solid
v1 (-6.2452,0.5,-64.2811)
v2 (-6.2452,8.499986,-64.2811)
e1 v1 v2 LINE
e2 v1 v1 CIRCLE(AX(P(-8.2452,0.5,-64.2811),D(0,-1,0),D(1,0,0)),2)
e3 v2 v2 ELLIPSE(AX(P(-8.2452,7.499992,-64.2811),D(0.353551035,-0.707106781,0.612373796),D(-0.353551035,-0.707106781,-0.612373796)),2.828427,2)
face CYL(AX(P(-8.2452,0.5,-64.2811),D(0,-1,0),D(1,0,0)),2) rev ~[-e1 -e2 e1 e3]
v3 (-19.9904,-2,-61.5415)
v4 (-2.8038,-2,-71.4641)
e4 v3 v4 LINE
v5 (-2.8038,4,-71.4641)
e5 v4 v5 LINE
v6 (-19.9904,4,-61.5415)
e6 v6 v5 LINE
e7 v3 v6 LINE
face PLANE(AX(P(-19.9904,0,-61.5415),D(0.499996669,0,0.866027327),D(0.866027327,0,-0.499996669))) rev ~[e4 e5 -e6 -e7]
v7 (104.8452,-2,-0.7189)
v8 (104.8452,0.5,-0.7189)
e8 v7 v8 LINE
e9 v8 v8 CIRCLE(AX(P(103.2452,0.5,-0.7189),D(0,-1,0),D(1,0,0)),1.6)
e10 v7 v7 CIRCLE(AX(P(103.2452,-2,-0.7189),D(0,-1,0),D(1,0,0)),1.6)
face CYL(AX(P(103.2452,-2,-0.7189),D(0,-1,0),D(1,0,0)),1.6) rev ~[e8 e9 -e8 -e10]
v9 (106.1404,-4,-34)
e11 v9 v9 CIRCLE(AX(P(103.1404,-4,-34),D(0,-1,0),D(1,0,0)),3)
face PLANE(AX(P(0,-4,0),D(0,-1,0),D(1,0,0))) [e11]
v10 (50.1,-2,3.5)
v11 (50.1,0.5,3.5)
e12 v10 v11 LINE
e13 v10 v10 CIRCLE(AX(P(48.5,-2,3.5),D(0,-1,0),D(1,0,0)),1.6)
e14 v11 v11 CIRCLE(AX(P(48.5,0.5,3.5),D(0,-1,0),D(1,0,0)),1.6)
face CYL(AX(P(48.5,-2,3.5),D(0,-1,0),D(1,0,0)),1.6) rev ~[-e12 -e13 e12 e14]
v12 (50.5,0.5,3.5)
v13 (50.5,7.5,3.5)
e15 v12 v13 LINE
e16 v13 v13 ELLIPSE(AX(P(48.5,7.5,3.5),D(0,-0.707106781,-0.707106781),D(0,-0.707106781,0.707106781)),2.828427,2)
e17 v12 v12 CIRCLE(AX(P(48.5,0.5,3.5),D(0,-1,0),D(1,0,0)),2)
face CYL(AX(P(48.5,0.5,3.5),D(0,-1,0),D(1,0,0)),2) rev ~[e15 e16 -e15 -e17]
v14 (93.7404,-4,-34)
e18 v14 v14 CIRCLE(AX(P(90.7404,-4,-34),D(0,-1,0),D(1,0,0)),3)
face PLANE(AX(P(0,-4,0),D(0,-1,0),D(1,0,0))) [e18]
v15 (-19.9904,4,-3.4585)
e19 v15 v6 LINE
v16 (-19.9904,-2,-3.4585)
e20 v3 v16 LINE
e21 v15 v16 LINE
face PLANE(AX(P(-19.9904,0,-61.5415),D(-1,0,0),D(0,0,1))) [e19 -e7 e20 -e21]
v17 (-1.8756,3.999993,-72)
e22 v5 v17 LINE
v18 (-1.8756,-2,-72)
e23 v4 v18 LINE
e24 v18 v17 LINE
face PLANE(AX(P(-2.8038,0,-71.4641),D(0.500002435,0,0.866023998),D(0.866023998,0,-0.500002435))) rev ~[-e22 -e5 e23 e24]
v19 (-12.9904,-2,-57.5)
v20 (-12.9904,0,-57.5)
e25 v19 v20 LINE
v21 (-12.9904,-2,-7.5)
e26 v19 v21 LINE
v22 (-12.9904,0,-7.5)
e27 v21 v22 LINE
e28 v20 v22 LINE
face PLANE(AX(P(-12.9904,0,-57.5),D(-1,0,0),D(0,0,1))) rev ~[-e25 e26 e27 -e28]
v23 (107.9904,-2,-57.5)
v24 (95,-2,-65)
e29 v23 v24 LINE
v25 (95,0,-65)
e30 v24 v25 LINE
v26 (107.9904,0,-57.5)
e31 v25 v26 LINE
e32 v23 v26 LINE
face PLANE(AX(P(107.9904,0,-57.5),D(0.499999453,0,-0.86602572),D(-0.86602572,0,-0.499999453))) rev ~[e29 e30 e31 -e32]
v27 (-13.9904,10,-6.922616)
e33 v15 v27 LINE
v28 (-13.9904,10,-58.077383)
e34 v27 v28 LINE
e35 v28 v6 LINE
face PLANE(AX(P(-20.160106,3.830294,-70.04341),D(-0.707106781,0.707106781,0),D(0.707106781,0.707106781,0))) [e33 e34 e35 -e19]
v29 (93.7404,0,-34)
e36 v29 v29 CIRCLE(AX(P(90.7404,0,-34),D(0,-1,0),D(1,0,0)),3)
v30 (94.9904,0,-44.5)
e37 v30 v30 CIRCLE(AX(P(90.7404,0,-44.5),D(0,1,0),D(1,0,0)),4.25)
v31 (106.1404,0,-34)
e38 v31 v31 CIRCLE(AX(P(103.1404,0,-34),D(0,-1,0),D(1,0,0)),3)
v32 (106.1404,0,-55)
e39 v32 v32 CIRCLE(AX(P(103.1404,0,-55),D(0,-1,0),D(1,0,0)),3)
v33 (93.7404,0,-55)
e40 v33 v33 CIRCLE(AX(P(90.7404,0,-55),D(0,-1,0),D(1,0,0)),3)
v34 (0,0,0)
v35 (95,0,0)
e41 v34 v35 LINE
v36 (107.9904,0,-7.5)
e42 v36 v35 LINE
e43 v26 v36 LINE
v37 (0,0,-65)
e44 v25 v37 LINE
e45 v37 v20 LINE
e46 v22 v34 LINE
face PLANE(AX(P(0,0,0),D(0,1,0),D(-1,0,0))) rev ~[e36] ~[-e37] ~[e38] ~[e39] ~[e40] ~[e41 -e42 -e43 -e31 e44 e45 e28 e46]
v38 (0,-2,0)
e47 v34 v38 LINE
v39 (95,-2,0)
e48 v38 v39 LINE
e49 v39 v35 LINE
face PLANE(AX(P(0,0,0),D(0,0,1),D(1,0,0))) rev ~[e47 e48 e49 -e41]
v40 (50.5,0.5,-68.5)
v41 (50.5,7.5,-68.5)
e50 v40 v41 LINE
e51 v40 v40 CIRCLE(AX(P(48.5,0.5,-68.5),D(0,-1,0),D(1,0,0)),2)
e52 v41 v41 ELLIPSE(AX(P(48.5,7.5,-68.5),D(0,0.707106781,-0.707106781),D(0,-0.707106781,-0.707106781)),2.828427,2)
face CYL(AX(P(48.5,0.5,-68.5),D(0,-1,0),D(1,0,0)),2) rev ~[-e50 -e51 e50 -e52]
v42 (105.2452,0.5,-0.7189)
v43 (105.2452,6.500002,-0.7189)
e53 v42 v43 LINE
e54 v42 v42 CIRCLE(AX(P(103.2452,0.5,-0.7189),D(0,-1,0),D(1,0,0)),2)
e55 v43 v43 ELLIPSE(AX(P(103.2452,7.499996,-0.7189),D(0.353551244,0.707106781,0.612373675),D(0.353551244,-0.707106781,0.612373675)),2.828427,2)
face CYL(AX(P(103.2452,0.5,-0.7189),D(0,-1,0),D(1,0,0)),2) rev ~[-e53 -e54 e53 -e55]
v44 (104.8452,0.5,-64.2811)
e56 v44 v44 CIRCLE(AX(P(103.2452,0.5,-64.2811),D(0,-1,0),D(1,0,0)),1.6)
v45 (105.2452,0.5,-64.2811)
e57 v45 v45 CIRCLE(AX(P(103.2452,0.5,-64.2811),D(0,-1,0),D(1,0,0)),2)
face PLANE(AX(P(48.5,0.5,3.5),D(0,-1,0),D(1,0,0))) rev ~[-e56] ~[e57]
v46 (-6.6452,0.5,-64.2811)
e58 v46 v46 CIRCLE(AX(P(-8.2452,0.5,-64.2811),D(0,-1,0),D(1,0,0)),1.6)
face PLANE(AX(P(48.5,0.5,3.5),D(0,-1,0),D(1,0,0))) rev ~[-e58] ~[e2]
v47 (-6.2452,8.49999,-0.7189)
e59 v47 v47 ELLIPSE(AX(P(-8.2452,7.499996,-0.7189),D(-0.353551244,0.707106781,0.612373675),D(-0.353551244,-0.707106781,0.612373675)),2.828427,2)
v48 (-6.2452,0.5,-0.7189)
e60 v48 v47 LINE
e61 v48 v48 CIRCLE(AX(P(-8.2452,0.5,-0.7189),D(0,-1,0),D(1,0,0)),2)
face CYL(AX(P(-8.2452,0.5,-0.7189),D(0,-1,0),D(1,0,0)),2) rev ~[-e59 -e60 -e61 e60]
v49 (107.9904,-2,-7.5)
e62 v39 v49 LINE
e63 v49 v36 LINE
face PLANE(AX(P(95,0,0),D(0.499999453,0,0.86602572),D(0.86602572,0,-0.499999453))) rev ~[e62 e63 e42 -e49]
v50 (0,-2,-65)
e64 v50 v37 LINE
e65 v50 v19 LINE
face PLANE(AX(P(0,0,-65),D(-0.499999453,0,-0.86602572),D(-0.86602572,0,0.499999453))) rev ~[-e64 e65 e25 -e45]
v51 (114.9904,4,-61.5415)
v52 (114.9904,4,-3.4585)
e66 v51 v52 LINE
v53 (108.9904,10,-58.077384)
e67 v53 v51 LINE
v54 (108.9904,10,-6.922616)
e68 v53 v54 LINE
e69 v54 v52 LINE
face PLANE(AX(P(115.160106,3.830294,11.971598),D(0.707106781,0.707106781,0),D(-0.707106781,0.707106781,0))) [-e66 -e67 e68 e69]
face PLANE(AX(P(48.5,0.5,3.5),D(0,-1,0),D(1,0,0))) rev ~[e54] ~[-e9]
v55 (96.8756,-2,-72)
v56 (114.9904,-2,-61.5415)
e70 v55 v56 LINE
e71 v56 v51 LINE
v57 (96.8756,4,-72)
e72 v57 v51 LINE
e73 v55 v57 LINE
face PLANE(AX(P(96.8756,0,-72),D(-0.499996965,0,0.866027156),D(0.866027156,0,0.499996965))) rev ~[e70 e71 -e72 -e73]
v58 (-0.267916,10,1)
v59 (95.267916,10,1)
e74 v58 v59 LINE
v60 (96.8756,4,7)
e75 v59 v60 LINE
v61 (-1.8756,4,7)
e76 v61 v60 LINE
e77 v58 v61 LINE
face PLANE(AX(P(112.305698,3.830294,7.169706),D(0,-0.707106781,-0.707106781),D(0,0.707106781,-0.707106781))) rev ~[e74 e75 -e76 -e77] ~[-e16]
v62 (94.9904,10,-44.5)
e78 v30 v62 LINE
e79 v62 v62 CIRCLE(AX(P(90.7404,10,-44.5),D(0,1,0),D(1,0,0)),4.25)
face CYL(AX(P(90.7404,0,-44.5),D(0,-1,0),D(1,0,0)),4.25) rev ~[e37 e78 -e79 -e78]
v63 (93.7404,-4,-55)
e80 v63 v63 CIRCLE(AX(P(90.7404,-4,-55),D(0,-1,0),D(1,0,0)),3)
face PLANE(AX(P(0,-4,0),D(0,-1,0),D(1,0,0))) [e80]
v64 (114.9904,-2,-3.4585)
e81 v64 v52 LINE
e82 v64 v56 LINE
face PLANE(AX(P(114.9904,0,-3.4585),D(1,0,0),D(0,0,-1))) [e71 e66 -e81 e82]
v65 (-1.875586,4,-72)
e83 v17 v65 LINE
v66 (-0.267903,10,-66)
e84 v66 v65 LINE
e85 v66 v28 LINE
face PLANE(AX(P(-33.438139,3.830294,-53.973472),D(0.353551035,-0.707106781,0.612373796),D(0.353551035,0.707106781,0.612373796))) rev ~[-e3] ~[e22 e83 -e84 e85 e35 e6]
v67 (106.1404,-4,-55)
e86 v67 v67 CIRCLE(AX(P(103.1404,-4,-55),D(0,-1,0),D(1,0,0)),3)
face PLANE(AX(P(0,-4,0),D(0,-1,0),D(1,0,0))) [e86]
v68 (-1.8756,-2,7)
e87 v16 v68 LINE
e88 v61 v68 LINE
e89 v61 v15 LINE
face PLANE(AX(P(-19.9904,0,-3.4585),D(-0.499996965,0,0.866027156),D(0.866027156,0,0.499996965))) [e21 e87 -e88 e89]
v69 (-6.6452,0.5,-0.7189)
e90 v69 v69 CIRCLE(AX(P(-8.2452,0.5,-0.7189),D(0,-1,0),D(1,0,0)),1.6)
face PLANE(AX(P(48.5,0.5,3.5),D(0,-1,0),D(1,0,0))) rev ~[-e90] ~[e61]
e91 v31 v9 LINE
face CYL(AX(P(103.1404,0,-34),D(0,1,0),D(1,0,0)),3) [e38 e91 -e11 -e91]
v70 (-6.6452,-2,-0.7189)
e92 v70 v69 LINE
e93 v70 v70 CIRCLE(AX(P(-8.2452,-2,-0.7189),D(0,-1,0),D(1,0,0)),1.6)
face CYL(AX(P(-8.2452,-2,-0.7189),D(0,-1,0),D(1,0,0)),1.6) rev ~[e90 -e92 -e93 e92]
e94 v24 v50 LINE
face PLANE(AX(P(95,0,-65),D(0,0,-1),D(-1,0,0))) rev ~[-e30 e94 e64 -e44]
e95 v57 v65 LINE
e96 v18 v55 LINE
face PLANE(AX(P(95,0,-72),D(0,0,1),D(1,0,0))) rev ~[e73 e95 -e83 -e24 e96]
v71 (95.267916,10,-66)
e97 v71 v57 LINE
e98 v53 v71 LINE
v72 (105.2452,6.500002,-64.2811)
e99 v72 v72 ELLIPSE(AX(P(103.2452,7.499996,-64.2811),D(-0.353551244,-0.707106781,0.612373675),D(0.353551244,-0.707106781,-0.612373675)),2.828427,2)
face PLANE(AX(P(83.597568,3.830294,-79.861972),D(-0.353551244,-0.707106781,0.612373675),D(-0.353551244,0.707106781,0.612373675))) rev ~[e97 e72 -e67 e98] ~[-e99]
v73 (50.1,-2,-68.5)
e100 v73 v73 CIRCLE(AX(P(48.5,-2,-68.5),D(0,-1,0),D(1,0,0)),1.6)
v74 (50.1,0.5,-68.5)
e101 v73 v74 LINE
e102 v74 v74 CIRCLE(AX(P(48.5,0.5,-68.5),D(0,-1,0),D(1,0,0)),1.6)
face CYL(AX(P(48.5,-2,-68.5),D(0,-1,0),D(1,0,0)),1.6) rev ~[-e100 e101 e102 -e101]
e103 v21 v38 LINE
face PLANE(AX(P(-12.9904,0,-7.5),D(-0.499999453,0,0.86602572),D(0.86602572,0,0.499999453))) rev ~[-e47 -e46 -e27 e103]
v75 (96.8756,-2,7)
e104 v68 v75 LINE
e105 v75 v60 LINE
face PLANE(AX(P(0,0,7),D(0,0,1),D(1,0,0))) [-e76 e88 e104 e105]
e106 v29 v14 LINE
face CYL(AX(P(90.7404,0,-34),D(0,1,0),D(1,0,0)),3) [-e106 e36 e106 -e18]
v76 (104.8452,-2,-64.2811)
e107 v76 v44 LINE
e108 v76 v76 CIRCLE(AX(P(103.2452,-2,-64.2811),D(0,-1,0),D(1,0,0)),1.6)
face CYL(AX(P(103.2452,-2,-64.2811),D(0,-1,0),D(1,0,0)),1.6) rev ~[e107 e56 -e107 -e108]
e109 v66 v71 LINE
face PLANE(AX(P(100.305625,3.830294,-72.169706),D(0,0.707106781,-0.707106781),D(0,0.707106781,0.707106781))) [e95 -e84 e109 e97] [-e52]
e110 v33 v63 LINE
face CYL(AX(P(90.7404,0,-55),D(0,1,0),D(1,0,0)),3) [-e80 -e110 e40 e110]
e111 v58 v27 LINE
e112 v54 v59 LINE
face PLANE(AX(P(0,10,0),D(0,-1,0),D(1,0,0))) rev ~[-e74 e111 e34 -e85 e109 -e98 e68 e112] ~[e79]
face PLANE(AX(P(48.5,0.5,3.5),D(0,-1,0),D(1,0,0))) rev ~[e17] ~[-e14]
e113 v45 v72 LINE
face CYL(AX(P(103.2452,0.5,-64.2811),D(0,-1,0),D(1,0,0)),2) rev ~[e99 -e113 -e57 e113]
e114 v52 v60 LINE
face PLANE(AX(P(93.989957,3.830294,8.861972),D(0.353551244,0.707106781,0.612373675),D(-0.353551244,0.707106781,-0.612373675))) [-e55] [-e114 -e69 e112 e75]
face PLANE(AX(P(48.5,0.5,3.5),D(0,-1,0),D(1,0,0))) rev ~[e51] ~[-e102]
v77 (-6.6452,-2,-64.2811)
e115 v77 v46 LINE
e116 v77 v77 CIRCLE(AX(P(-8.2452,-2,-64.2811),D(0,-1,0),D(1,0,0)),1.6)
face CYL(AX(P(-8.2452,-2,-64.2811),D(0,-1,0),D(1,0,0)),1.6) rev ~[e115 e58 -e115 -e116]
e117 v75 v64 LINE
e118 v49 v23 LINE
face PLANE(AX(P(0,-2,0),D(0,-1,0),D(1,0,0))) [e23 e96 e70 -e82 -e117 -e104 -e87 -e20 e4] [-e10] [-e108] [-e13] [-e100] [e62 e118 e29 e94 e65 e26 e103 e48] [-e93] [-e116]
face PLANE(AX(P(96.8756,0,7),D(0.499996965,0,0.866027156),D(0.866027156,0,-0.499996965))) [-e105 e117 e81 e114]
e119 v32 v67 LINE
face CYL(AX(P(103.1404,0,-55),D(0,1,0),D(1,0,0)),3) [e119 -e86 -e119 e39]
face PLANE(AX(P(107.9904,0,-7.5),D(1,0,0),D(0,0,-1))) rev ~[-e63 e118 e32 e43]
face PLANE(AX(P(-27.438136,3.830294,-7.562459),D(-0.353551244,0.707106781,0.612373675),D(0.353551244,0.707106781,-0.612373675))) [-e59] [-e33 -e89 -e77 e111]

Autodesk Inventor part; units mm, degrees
ref_plane "YZ Plane" through (0, 0, 0) normal (1, 0, 0) x (0, 1, 0)
ref_plane "XZ Plane" through (0, 0, 0) normal (0, 1, 0) x (-1, 0, 0)
ref_plane "XY Plane" through (0, 0, 0) normal (0, 0, 1) x (1, 0, 0)
sketch "Sketch5" plane through (0, 0, 0) normal (0, 1, 0) x (-1, 0, 0)
  line L0 (0, 0) -> (-95, 0)
  line L1 (-95, 0) -> (-95, -65)
  line L2 (-95, -65) -> (0, -65)
  line L3 (0, -65) -> (0, 0)
  line L4 (0, -65) -> (12.9904, -57.5)
  line L5 (12.9904, -57.5) -> (12.9904, -7.5)
  line L6 (12.9904, -7.5) -> (0, 0)
  line L7 (-95, -65) -> (-107.9904, -57.5)
  line L8 (-107.9904, -57.5) -> (-107.9904, -7.5)
  line L9 (-107.9904, -7.5) -> (-95, 0)
  dimension "d23" = 95
  dimension "d24" = 65
  dimension "d25" = 15
  dimension "d26" = 15
  dimension "d27" = 120
  dimension "d28" = 15
  dimension "d29" = 15
  dimension "d30" = 120
extrude "Extrusion3" add sketch "Sketch5" along normal blind 10
sketch "Sketch6" plane through (0, 0, 0) normal (0, -1, 0) x (1, 0, 0)
  line L0 (0, 7) -> (87, 7)
  line L1 (95, -72) -> (8, -72)
  line L2 (0, 0) -> (95, 0) projected
  line L3 (95, -65) -> (0, -65) projected
  line L4 (96.8756, 7) -> (114.9904, -3.4585)
  line L5 (95, 0) -> (107.9904, -7.5) projected
  line L6 (114.9904, -3.4585) -> (114.9904, -61.5415)
  line L7 (107.9904, -7.5) -> (107.9904, -57.5) projected
  line L8 (96.8756, -72) -> (114.9904, -61.5415)
  line L9 (107.9904, -57.5) -> (95, -65) projected
  line L10 (107.9904, -57.5) -> (95, -65) projected
  line L11 (87, 7) -> (96.8756, 7)
  line L12 (95, -72) -> (96.8756, -72)
  line L13 (0, 7) -> (-1.8756, 7)
  line L14 (-19.9904, -3.4585) -> (-1.8756, 7)
  line L15 (-19.9904, -61.5415) -> (-2.8038, -71.4641)
  line L16 (0, -65) -> (-12.9904, -57.5) projected
  line L17 (-12.9904, -7.5) -> (0, 0) projected
  line L18 (-19.9904, -61.5415) -> (-19.9904, -3.4585)
  line L19 (-12.9904, -57.5) -> (-12.9904, -7.5) projected
  line L20 (0, -65) -> (-12.9904, -57.5) projected
  line L21 (-12.9904, -7.5) -> (-12.9904, -57.5)
  line L22 (-12.9904, -57.5) -> (0, -65)
  line L23 (95, -65) -> (0, -65) projected
  line L24 (0, -65) -> (95, -65)
  line L25 (95, -65) -> (107.9904, -57.5)
  line L26 (107.9904, -7.5) -> (107.9904, -57.5)
  line L27 (95, 0) -> (107.9904, -7.5) projected
  line L28 (107.9904, -7.5) -> (95, 0)
  line L29 (0, 0) -> (-12.9904, -7.5)
  line L30 (95, 0) -> (0, 0)
  line L31 (8, -72) -> (-1.8756, -72)
  line L32 (-2.8038, -71.4641) -> (-1.8756, -72)
  dimension "d33" = 7
  dimension "d34" = 7
  dimension "d35" = 7
  dimension "d36" = 7
  dimension "d37" = 7
  dimension "d38" = 7
  dimension "d39" = 7
  dimension "d40" = 7
extrude "Extrusion4" add sketch "Sketch6" along normal blind 2 and the other way blind 10
chamfer "Chamfer1" distance 6 angle 45 8 edges at (47.5, 10, 7) (-10.933, 10, 1.7707) (-19.9904, 10, -32.5) (-10.933, 10, -66.7707) (47.5, 10, -72) (105.933, 10, -66.7707) (114.9904, 10, -32.5) (105.933, 10, 1.7707)
sketch "Sketch7" plane through (0, 0, 0) normal (0, -1, 0) x (1, 0, 0)
  line L0 (86.4904, -40.25) -> (94.9904, -40.25)
  line L1 (94.9904, -40.25) -> (94.9904, -48.75)
  line L2 (94.9904, -48.75) -> (86.4904, -48.75)
  line L3 (86.4904, -48.75) -> (86.4904, -40.25)
  line L4 (96.8756, 7) -> (-1.8756, 7) projected
  line L5 (114.9904, -61.5415) -> (114.9904, -3.4585) projected
  circle A0 centre (90.7404, -55) radius 3
  circle A1 centre (90.7404, -34) radius 3
  circle A2 centre (103.1404, -34) radius 3
  circle A3 centre (103.1404, -55) radius 3
  circle A4 centre (90.7404, -44.5) radius 4.25
  circle A5 centre (46.5, 2.8174) radius 1.834
  circle A6 centre (46.5, -64.297) radius 1.834
  line L6 (-1.8756, -72) -> (96.8756, -72) projected
  point P0 (0, 0)
  dimension "d48" = 8.5
  dimension "d50" = 20
  dimension "d51" = 6.25
  dimension "d52" = 8.15
  dimension "d53" = 12.4
  dimension "d54" = 0
  dimension "d55" = 21
  dimension "d56" = 12.4
  dimension "d57" = 0
  dimension "d58" = 0
  dimension "d59" = 6
  dimension "d61" = 8.5
  dimension "d107" = 27.5
sketch "Sketch9" plane through (0, -2, 0) normal (0, -1, 0) x (1, 0, 0)
  circle A0 centre (-8.2452, -0.7189) radius 1.6
  line L0 (0, -65) -> (-12.9904, -57.5) projected
  line L1 (0, -65) -> (-1.8756, -72) projected
  line L2 (95, -65) -> (0, -65) projected
  line L3 (107.9904, -7.5) -> (107.9904, -57.5) projected
  line L4 (0, 0) -> (95, 0) projected
  line L5 (-12.9904, -7.5) -> (-16.4904, -1.4378)
  line L6 (-19.9904, -3.4585) -> (-1.8756, 7) projected
  line L7 (0, 0) -> (-3.5, 6.0622)
  line L8 (-12.9904, -57.5) -> (-19.9904, -61.5415) projected
  line L9 (-12.9904, -57.5) -> (-15.4904, -61.8301)
  line L10 (0, -65) -> (-2.5, -69.3301)
  line L11 (95, -65) -> (97.5, -69.3301)
  line L12 (95, 0) -> (98.5, 6.0622)
  line L13 (96.8756, 7) -> (114.9904, -3.4585) projected
  line L14 (107.9904, -7.5) -> (114.9904, -3.4585) projected
  line L15 (107.9904, -7.5) -> (111.4904, -1.4378)
  line L16 (107.9904, -57.5) -> (111.4904, -63.5622)
  line L17 (96.8756, -72) -> (114.9904, -61.5415) projected
  line L18 (107.9904, -57.5) -> (95, -65) projected
  line L19 (95, 0) -> (107.9904, -7.5) projected
  circle A1 centre (-8.2452, -64.2811) radius 1.6
  circle A2 centre (103.2452, -64.2811) radius 1.6
  circle A3 centre (103.2452, -0.7189) radius 1.6
  circle A4 centre (48.5, 3.5) radius 1.6
  circle A5 centre (48.5, -68.5) radius 1.6
  line L20 (95, -65) -> (95, -72)
  line L21 (-1.8756, -72) -> (96.8756, -72) projected
  line L22 (95, 0) -> (95, 7)
  line L23 (96.8756, 7) -> (-1.8756, 7) projected
  dimension "d62" = 90
  dimension "d63" = 90
  dimension "d64" = 90
  dimension "d65" = 7.5
  dimension "d66" = 3.5
  dimension "d67" = 3.2
  dimension "d68" = 7.5
  dimension "d69" = 3.5
  dimension "d70" = 3.5
  dimension "d71" = 7.5
  dimension "d72" = 7.5
  dimension "d73" = 3.5
  dimension "d76" = 3.5
  dimension "d77" = 46.5
  dimension "d78" = 3.5
  dimension "d79" = 46.5
extrude "Extrusion6" cut sketch "Sketch9" against normal blind 2.5 contours A0 | A1 | A2 | A3 | A4 | A5
sketch "Sketch13" plane through (48.5, 0.5, 3.5) normal (0, -1, 0) x (1, 0, 0)
  circle A0 centre (0, 0) radius 2
  circle A1 centre (54.7452, -4.2189) radius 2
  circle A2 centre (54.7452, -67.7811) radius 2
  circle A3 centre (0, -72) radius 2
  circle A4 centre (-56.7452, -67.7811) radius 2
  circle A5 centre (-56.7452, -4.2189) radius 2
  circle A6 centre (-56.7452, -4.2189) radius 1.6 projected
  circle A7 centre (0, 0) radius 1.6 projected
  circle A8 centre (54.7452, -4.2189) radius 1.6 projected
  circle A9 centre (54.7452, -67.7811) radius 1.6 projected
  circle A10 centre (0, -72) radius 1.6 projected
  circle A11 centre (-56.7452, -67.7811) radius 1.6 projected
  point P0 (-48.5, -3.5)
  dimension "d90" = 4
  dimension "d91" = 4
  dimension "d92" = 4
  dimension "d93" = 4
  dimension "d94" = 4
  dimension "d95" = 4
extrude "Extrusion7" cut sketch "Sketch13" against normal blind 10 contours A0 | A1 | A2 | A3 | A4 | A5 | A6 | A7 | A8 | A9 | A10 | A11
extrude "Extrusion8" add sketch "Sketch7" along normal blind 4 contours A0 | A1 | A2 | A3
sketch "Sketch14" plane through (0, 0, 0) normal (0, -1, 0) x (1, 0, 0)
  line L0 (86.4904, -48.75) -> (94.9904, -48.75)
  line L1 (94.9904, -48.75) -> (94.9904, -40.25)
  line L2 (94.9904, -40.25) -> (86.4904, -40.25)
  line L3 (86.4904, -40.25) -> (86.4904, -48.75)
  line L4 (95, -65) -> (0, -65) projected
  line L5 (107.9904, -7.5) -> (107.9904, -57.5) projected
  circle A0 centre (90.7404, -44.5) radius 4.25
  circle A1 centre (90.7404, -55) radius 3 projected
  point P0 (0, 0)
  dimension "d100" = 8.5
  dimension "d101" = 8.5
  dimension "d103" = 13
  dimension "d104" = 8.5
  dimension "d108" = 9.25
extrude "Extrusion9" cut sketch "Sketch14" against normal blind 10 contours A0
properties part number "Topv3"
